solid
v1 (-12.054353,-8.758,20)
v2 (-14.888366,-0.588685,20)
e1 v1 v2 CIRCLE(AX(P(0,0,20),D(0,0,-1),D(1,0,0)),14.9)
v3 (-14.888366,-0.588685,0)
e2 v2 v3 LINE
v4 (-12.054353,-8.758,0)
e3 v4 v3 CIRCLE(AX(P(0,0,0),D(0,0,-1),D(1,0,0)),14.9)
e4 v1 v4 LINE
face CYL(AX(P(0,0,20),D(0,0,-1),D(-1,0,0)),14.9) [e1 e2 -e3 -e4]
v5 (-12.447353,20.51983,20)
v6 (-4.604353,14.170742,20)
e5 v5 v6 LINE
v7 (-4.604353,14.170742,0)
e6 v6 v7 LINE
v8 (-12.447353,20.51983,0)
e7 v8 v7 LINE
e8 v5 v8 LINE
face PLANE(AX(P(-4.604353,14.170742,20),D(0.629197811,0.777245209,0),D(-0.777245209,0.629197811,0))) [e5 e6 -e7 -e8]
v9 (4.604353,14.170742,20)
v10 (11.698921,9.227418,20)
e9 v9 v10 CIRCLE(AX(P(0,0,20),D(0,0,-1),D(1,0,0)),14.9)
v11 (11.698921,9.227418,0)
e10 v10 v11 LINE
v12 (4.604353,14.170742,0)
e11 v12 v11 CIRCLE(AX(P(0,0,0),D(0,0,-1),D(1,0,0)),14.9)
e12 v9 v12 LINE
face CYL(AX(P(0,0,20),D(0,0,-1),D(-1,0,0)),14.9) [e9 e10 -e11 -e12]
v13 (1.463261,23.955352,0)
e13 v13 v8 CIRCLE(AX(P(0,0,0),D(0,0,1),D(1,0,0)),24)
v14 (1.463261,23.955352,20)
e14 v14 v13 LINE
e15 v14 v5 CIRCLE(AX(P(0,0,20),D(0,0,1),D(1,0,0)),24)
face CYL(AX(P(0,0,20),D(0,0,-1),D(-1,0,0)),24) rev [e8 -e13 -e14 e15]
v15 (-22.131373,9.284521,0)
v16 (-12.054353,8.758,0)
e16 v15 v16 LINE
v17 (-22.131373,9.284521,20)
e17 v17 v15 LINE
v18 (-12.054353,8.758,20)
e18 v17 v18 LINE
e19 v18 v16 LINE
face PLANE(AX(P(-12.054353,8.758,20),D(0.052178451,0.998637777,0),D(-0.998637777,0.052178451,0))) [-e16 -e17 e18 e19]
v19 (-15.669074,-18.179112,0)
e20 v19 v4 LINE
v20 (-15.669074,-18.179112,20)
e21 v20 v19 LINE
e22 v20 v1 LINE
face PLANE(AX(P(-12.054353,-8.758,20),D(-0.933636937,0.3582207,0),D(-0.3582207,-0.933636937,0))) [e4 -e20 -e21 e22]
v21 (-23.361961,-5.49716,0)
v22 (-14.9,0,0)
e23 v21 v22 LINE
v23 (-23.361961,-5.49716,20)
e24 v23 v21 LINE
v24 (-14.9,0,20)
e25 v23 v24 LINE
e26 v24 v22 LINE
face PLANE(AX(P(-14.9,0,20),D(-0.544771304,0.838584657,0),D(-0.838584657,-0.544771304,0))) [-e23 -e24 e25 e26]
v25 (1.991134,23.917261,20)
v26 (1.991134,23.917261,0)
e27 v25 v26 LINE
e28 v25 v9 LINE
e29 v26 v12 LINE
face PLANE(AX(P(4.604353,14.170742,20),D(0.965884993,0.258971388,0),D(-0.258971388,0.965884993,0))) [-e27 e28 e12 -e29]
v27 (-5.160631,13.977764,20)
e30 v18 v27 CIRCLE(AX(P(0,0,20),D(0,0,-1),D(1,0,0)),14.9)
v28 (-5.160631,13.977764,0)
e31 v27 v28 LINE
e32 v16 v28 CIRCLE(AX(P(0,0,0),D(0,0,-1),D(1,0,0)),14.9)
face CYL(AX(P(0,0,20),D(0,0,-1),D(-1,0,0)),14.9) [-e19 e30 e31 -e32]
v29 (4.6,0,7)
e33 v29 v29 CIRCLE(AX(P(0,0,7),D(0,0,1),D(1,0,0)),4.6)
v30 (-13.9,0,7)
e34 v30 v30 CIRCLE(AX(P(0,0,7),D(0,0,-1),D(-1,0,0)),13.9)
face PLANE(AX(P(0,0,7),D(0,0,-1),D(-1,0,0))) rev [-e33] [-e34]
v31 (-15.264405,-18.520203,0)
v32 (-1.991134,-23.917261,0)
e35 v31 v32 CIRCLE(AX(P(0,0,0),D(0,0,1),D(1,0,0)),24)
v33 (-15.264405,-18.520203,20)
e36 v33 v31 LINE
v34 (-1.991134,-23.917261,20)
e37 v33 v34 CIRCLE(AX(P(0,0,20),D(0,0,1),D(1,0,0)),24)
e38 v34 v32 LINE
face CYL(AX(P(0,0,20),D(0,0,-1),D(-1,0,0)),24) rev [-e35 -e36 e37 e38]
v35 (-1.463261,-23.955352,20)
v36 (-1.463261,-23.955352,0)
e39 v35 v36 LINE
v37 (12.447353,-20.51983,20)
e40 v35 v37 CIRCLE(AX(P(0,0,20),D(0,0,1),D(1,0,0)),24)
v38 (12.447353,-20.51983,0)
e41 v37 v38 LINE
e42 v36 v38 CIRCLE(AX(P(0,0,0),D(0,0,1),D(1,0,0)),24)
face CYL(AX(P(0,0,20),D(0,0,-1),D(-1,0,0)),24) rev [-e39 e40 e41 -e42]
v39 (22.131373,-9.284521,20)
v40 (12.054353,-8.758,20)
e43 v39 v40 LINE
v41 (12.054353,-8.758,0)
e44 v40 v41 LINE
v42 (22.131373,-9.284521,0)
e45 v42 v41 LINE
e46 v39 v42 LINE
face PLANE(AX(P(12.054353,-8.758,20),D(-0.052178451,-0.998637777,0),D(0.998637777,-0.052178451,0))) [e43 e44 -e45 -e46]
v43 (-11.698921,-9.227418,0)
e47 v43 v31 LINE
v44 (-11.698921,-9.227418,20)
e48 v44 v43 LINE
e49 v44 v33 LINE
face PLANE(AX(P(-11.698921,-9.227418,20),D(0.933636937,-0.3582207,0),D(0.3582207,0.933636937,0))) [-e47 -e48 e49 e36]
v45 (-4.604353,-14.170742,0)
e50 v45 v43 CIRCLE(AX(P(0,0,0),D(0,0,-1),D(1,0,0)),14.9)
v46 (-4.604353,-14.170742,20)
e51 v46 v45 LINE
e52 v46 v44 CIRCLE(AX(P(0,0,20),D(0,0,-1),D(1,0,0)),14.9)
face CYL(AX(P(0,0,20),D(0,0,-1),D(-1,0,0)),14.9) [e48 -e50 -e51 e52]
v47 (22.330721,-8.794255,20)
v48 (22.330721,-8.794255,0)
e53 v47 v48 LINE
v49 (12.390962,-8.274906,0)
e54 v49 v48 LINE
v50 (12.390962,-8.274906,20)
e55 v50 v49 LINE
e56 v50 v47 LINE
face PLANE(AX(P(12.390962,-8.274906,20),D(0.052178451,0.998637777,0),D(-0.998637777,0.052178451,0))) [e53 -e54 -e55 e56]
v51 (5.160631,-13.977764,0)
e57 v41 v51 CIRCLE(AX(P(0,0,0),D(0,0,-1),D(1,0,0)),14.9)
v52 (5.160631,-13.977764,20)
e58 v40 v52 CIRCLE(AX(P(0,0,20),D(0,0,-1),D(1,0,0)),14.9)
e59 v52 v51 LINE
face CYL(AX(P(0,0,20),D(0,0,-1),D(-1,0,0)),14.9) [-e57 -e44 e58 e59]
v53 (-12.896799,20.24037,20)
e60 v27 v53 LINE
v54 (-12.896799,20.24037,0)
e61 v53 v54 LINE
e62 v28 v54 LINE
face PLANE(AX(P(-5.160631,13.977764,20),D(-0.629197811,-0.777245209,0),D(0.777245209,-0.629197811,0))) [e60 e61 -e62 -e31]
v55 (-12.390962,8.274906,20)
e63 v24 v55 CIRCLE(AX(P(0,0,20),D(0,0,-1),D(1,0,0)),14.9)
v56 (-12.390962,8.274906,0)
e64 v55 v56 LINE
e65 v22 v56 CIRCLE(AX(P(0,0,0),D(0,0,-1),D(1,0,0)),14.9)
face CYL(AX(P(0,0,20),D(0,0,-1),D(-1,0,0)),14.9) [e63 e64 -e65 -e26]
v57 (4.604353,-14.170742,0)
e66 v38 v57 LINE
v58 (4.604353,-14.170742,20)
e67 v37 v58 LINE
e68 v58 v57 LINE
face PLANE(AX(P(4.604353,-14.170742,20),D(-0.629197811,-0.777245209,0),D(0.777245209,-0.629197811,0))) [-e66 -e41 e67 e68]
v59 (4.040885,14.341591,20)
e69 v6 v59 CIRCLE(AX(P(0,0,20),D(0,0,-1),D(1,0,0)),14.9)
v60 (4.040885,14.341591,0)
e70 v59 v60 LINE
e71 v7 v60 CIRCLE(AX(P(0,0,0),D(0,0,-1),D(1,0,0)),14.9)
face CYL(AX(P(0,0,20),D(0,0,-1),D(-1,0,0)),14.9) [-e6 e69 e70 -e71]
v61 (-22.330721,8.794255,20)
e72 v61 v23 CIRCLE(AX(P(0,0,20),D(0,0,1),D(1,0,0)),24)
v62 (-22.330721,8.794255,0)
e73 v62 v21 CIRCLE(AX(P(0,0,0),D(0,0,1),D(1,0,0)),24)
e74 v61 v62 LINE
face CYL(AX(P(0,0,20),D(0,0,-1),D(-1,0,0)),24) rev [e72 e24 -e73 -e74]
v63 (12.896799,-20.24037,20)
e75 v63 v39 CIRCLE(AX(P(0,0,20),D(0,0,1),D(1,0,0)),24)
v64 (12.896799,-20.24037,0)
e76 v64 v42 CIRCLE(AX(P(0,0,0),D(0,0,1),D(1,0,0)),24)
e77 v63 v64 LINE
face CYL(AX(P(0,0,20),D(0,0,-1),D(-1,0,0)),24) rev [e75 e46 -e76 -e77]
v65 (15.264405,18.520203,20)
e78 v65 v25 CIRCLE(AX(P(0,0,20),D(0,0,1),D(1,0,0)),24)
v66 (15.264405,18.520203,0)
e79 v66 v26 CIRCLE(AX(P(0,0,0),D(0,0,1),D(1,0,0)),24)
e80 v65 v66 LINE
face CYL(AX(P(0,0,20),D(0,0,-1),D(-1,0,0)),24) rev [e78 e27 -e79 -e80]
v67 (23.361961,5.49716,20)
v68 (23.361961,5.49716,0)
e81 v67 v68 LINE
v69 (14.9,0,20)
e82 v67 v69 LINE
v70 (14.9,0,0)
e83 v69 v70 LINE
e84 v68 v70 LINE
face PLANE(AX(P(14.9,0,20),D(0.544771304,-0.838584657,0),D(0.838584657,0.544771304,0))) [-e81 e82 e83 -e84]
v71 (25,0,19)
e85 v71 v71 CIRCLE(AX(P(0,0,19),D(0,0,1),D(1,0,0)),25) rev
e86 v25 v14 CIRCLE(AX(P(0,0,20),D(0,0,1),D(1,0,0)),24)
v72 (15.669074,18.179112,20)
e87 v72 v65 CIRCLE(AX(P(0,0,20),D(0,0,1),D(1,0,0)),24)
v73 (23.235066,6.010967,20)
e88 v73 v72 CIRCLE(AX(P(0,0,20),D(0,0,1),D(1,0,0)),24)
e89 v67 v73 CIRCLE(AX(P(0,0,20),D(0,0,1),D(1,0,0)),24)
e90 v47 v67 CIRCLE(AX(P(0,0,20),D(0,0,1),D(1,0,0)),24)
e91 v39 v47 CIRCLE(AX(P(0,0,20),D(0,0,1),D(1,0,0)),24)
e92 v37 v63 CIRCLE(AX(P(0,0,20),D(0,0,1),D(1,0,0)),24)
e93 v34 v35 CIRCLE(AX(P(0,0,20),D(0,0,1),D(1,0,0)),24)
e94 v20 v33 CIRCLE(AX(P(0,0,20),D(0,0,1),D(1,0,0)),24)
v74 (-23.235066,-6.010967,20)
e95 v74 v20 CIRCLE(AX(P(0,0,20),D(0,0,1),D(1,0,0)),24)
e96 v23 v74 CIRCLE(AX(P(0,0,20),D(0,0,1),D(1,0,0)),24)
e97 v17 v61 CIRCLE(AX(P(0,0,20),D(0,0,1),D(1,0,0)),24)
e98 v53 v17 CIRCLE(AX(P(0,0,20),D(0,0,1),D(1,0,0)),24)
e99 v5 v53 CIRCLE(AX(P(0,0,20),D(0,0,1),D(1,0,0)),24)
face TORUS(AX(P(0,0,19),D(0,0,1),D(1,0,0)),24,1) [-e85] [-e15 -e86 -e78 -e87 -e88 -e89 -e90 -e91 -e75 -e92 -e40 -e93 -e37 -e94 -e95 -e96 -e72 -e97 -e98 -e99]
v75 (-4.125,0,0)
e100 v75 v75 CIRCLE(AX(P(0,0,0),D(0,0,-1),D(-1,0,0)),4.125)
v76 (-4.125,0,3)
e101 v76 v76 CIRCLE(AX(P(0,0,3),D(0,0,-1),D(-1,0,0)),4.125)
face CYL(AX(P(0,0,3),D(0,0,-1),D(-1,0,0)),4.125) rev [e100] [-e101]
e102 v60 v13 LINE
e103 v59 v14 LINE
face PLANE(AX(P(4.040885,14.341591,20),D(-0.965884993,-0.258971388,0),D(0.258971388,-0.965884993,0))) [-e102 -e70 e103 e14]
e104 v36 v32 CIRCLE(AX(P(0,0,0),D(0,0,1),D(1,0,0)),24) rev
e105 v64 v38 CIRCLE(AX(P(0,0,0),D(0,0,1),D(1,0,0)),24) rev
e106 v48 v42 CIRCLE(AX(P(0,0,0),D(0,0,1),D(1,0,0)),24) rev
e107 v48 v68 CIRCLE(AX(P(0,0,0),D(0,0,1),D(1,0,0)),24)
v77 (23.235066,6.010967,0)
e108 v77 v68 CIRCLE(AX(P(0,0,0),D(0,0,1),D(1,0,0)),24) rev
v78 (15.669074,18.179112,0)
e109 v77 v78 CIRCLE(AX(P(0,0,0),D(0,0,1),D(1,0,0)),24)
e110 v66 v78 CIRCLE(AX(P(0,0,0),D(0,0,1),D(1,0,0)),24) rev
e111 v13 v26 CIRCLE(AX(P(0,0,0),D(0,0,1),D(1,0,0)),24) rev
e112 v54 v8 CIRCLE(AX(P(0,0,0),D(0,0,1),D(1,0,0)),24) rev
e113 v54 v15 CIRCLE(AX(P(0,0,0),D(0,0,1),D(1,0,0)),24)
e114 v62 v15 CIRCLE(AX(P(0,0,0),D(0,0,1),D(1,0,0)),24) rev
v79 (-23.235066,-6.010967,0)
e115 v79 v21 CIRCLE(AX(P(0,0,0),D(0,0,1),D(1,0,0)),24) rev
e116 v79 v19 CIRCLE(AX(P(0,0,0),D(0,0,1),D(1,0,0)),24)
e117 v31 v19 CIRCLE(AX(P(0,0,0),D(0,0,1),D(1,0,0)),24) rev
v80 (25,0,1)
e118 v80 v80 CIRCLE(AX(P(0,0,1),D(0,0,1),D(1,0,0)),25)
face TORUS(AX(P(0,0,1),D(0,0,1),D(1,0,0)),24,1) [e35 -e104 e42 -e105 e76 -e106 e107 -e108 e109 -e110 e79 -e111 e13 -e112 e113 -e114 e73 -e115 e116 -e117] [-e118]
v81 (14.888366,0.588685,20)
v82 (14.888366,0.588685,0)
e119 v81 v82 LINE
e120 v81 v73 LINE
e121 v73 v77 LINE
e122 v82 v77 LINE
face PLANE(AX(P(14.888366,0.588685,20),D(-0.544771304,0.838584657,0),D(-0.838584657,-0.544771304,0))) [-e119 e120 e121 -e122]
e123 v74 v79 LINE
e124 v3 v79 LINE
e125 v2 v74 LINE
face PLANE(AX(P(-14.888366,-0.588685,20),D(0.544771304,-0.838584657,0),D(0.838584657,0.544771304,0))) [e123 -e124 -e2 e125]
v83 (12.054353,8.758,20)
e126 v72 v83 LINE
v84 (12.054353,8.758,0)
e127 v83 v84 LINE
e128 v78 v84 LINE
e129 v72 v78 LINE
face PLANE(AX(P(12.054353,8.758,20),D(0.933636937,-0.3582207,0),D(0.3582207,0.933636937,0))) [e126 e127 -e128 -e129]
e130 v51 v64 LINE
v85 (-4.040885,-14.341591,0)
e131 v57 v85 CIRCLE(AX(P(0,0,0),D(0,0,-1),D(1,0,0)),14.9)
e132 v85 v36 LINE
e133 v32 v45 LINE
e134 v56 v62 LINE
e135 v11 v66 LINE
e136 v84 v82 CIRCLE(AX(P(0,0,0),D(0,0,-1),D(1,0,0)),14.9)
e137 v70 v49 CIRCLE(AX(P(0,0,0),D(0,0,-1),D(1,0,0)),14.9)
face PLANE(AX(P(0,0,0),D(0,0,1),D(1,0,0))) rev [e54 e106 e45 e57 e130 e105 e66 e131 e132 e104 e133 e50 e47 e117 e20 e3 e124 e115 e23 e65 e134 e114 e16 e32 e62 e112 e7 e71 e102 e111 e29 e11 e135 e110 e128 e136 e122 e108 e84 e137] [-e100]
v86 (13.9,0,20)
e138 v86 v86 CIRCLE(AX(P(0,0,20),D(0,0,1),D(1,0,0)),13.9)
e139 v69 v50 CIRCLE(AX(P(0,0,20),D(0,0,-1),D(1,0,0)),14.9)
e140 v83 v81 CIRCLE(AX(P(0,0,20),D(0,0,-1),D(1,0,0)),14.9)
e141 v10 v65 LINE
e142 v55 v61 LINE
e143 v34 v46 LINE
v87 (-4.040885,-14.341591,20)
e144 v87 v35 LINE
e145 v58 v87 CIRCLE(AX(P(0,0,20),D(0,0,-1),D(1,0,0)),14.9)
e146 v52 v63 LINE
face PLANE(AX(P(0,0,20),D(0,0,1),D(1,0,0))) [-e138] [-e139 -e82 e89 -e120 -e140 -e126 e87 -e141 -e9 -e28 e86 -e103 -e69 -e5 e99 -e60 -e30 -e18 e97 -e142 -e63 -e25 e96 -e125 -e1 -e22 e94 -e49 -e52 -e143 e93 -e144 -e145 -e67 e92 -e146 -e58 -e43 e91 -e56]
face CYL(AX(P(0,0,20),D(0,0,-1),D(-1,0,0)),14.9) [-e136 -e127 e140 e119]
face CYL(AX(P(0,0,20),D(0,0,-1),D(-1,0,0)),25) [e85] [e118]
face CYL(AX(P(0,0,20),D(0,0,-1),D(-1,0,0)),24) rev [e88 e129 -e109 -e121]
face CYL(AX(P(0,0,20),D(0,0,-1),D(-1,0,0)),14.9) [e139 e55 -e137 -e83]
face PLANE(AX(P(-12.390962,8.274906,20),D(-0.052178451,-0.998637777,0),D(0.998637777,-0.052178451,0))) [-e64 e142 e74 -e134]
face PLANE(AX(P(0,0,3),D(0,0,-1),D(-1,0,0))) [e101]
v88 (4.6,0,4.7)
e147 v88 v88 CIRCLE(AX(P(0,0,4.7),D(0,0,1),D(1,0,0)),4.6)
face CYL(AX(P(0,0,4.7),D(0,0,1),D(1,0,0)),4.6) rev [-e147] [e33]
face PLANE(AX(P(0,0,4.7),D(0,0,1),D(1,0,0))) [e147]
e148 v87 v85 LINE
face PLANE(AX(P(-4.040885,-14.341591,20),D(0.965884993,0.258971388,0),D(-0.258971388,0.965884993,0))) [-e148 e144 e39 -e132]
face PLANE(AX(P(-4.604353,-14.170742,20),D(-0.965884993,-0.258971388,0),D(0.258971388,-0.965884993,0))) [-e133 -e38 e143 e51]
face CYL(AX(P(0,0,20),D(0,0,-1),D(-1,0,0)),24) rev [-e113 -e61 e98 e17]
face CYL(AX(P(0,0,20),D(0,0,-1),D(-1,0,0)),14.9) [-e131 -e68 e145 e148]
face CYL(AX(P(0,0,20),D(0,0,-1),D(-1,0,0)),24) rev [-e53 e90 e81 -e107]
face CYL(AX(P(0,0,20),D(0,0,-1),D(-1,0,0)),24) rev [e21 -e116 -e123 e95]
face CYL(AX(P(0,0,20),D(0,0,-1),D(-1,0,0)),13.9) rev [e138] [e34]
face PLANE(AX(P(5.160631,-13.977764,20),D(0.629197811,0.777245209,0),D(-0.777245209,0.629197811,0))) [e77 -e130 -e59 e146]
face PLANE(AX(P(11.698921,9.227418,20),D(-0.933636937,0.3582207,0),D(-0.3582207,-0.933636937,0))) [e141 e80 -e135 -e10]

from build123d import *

# Parameters (mm, degrees)
SKETCH1_R           = 25
SKETCH1_R_2         = 13.9
BOSS_EXTRUDE1_DEPTH = 20
FILLET1_R           = 1
SKETCH2_R           = 13.9
BOSS_EXTRUDE2_DEPTH = 7
SKETCH3_R           = 4.125
CUT_EXTRUDE1_DEPTH  = 3
SKETCH4_R           = 4.6
CUT_EXTRUDE2_DEPTH  = 2.3


with BuildPart() as part:
    # Sketch1 → Boss-Extrude1 (new body)
    with BuildSketch(Plane.XY):
        Circle(SKETCH1_R)
        Circle(SKETCH1_R_2, mode=Mode.SUBTRACT)
        with BuildLine():
            Line((14.9, 0), (23.361961312, 5.497159601))
            ThreePointArc((23.361961312, 5.497159601), (23.937761526, -1.727302272), (22.330720685, -8.794254584))
            Line((22.330720685, -8.794254584), (12.390961728, -8.274905888))
            ThreePointArc((12.390961728, -8.274905888), (14.258950343, -4.323463325), (14.9, 0))
        make_face(mode=Mode.SUBTRACT)
        with BuildLine():
            Line((14.88836626, 0.588685076), (23.23506568, 6.010966881))
            ThreePointArc((23.23506568, 6.010966881), (20.381338683, 12.672846305), (15.66907438, 18.179111861))
            Line((15.66907438, 18.179111861), (12.054353216, 8.758000259))
            ThreePointArc((12.054353216, 8.758000259), (14.077001131, 4.88344542), (14.88836626, 0.588685076))
        make_face(mode=Mode.SUBTRACT)
        with BuildLine():
            Line((12.054353216, -8.758000259), (22.131373066, -9.284520786))
            ThreePointArc((22.131373066, -9.284520786), (18.35077308, -15.46768009), (12.896799382, -20.240369703))
            Line((12.896799382, -20.240369703), (5.16063097, -13.977764056))
            ThreePointArc((5.16063097, -13.977764056), (8.994465168, -11.878956029), (12.054353216, -8.758000259))
        make_face(mode=Mode.SUBTRACT)
        with BuildLine():
            Line((4.604353216, -14.170742093), (12.447352527, -20.519829801))
            ThreePointArc((12.447352527, -20.519829801), (5.754413037, -23.299929841), (-1.46326094, -23.95535154))
            Line((-1.46326094, -23.95535154), (-4.040885415, -14.341591441))
            ThreePointArc((-4.040885415, -14.341591441), (0.294400009, -14.897091281), (4.604353216, -14.170742093))
        make_face(mode=Mode.SUBTRACT)
        with BuildLine():
            Line((-4.604353216, -14.170742093), (-1.991133608, -23.917261276))
            ThreePointArc((-1.991133608, -23.917261276), (-9.0399372, -22.232398328), (-15.264405316, -18.520203302))
            Line((-15.264405316, -18.520203302), (-11.698920917, -9.227418349))
            ThreePointArc((-11.698920917, -9.227418349), (-8.518115946, -12.225043997), (-4.604353216, -14.170742093))
        make_face(mode=Mode.SUBTRACT)
        with BuildLine():
            Line((-12.054353216, -8.758000259), (-15.66907438, -18.179111861))
            ThreePointArc((-15.66907438, -18.179111861), (-20.381338683, -12.672846305), (-23.23506568, -6.010966881))
            Line((-23.23506568, -6.010966881), (-14.88836626, -0.588685076))
            ThreePointArc((-14.88836626, -0.588685076), (-14.077001131, -4.88344542), (-12.054353216, -8.758000259))
        make_face(mode=Mode.SUBTRACT)
        with BuildLine():
            Line((-14.9, 0), (-23.361961312, -5.497159601))
            ThreePointArc((-23.361961312, -5.497159601), (-23.937761526, 1.727302272), (-22.330720685, 8.794254584))
            Line((-22.330720685, 8.794254584), (-12.390961728, 8.274905888))
            ThreePointArc((-12.390961728, 8.274905888), (-14.258950343, 4.323463325), (-14.9, 0))
        make_face(mode=Mode.SUBTRACT)
        with BuildLine():
            Line((-12.054353216, 8.758000259), (-22.131373066, 9.284520786))
            ThreePointArc((-22.131373066, 9.284520786), (-18.35077308, 15.46768009), (-12.896799382, 20.240369703))
            Line((-12.896799382, 20.240369703), (-5.16063097, 13.977764056))
            ThreePointArc((-5.16063097, 13.977764056), (-8.994465168, 11.878956029), (-12.054353216, 8.758000259))
        make_face(mode=Mode.SUBTRACT)
        with BuildLine():
            Line((-4.604353216, 14.170742093), (-12.447352527, 20.519829801))
            ThreePointArc((-12.447352527, 20.519829801), (-5.754413037, 23.299929841), (1.46326094, 23.95535154))
            Line((1.46326094, 23.95535154), (4.040885415, 14.341591441))
            ThreePointArc((4.040885415, 14.341591441), (-0.294400009, 14.897091281), (-4.604353216, 14.170742093))
        make_face(mode=Mode.SUBTRACT)
        with BuildLine():
            Line((4.604353216, 14.170742093), (1.991133608, 23.917261276))
            ThreePointArc((1.991133608, 23.917261276), (9.0399372, 22.232398328), (15.264405316, 18.520203302))
            Line((15.264405316, 18.520203302), (11.698920917, 9.227418349))
            ThreePointArc((11.698920917, 9.227418349), (8.518115946, 12.225043997), (4.604353216, 14.170742093))
        make_face(mode=Mode.SUBTRACT)
    extrude(amount=BOSS_EXTRUDE1_DEPTH)

    # Fillet1
    fillet1_edges = [part.edges().sort_by_distance(p)[0] for p in [
        (-25, 0, 0),
        (-25, 0, 20),
    ]]
    fillet(fillet1_edges, radius=FILLET1_R - 0.0001)  # a hair under: the kernel refuses the full size

    # Sketch2 → Boss-Extrude2 (add)
    with BuildSketch(Plane(origin=(0, 0, 0), x_dir=(-1, 0, 0), z_dir=(0, 0, -1))):
        Circle(SKETCH2_R)
    extrude(amount=-BOSS_EXTRUDE2_DEPTH)

    # Sketch3 → Cut-Extrude1 (cut)
    with BuildSketch(Plane(origin=(0, 0, 0), x_dir=(-1, 0, 0), z_dir=(0, 0, -1))):
        Circle(SKETCH3_R)
    extrude(amount=-CUT_EXTRUDE1_DEPTH, mode=Mode.SUBTRACT)

    # Sketch4 → Cut-Extrude2 (cut)
    with BuildSketch(Plane.XY.offset(7)):
        Circle(SKETCH4_R)
    extrude(amount=-CUT_EXTRUDE2_DEPTH, mode=Mode.SUBTRACT)


solid = part.part
